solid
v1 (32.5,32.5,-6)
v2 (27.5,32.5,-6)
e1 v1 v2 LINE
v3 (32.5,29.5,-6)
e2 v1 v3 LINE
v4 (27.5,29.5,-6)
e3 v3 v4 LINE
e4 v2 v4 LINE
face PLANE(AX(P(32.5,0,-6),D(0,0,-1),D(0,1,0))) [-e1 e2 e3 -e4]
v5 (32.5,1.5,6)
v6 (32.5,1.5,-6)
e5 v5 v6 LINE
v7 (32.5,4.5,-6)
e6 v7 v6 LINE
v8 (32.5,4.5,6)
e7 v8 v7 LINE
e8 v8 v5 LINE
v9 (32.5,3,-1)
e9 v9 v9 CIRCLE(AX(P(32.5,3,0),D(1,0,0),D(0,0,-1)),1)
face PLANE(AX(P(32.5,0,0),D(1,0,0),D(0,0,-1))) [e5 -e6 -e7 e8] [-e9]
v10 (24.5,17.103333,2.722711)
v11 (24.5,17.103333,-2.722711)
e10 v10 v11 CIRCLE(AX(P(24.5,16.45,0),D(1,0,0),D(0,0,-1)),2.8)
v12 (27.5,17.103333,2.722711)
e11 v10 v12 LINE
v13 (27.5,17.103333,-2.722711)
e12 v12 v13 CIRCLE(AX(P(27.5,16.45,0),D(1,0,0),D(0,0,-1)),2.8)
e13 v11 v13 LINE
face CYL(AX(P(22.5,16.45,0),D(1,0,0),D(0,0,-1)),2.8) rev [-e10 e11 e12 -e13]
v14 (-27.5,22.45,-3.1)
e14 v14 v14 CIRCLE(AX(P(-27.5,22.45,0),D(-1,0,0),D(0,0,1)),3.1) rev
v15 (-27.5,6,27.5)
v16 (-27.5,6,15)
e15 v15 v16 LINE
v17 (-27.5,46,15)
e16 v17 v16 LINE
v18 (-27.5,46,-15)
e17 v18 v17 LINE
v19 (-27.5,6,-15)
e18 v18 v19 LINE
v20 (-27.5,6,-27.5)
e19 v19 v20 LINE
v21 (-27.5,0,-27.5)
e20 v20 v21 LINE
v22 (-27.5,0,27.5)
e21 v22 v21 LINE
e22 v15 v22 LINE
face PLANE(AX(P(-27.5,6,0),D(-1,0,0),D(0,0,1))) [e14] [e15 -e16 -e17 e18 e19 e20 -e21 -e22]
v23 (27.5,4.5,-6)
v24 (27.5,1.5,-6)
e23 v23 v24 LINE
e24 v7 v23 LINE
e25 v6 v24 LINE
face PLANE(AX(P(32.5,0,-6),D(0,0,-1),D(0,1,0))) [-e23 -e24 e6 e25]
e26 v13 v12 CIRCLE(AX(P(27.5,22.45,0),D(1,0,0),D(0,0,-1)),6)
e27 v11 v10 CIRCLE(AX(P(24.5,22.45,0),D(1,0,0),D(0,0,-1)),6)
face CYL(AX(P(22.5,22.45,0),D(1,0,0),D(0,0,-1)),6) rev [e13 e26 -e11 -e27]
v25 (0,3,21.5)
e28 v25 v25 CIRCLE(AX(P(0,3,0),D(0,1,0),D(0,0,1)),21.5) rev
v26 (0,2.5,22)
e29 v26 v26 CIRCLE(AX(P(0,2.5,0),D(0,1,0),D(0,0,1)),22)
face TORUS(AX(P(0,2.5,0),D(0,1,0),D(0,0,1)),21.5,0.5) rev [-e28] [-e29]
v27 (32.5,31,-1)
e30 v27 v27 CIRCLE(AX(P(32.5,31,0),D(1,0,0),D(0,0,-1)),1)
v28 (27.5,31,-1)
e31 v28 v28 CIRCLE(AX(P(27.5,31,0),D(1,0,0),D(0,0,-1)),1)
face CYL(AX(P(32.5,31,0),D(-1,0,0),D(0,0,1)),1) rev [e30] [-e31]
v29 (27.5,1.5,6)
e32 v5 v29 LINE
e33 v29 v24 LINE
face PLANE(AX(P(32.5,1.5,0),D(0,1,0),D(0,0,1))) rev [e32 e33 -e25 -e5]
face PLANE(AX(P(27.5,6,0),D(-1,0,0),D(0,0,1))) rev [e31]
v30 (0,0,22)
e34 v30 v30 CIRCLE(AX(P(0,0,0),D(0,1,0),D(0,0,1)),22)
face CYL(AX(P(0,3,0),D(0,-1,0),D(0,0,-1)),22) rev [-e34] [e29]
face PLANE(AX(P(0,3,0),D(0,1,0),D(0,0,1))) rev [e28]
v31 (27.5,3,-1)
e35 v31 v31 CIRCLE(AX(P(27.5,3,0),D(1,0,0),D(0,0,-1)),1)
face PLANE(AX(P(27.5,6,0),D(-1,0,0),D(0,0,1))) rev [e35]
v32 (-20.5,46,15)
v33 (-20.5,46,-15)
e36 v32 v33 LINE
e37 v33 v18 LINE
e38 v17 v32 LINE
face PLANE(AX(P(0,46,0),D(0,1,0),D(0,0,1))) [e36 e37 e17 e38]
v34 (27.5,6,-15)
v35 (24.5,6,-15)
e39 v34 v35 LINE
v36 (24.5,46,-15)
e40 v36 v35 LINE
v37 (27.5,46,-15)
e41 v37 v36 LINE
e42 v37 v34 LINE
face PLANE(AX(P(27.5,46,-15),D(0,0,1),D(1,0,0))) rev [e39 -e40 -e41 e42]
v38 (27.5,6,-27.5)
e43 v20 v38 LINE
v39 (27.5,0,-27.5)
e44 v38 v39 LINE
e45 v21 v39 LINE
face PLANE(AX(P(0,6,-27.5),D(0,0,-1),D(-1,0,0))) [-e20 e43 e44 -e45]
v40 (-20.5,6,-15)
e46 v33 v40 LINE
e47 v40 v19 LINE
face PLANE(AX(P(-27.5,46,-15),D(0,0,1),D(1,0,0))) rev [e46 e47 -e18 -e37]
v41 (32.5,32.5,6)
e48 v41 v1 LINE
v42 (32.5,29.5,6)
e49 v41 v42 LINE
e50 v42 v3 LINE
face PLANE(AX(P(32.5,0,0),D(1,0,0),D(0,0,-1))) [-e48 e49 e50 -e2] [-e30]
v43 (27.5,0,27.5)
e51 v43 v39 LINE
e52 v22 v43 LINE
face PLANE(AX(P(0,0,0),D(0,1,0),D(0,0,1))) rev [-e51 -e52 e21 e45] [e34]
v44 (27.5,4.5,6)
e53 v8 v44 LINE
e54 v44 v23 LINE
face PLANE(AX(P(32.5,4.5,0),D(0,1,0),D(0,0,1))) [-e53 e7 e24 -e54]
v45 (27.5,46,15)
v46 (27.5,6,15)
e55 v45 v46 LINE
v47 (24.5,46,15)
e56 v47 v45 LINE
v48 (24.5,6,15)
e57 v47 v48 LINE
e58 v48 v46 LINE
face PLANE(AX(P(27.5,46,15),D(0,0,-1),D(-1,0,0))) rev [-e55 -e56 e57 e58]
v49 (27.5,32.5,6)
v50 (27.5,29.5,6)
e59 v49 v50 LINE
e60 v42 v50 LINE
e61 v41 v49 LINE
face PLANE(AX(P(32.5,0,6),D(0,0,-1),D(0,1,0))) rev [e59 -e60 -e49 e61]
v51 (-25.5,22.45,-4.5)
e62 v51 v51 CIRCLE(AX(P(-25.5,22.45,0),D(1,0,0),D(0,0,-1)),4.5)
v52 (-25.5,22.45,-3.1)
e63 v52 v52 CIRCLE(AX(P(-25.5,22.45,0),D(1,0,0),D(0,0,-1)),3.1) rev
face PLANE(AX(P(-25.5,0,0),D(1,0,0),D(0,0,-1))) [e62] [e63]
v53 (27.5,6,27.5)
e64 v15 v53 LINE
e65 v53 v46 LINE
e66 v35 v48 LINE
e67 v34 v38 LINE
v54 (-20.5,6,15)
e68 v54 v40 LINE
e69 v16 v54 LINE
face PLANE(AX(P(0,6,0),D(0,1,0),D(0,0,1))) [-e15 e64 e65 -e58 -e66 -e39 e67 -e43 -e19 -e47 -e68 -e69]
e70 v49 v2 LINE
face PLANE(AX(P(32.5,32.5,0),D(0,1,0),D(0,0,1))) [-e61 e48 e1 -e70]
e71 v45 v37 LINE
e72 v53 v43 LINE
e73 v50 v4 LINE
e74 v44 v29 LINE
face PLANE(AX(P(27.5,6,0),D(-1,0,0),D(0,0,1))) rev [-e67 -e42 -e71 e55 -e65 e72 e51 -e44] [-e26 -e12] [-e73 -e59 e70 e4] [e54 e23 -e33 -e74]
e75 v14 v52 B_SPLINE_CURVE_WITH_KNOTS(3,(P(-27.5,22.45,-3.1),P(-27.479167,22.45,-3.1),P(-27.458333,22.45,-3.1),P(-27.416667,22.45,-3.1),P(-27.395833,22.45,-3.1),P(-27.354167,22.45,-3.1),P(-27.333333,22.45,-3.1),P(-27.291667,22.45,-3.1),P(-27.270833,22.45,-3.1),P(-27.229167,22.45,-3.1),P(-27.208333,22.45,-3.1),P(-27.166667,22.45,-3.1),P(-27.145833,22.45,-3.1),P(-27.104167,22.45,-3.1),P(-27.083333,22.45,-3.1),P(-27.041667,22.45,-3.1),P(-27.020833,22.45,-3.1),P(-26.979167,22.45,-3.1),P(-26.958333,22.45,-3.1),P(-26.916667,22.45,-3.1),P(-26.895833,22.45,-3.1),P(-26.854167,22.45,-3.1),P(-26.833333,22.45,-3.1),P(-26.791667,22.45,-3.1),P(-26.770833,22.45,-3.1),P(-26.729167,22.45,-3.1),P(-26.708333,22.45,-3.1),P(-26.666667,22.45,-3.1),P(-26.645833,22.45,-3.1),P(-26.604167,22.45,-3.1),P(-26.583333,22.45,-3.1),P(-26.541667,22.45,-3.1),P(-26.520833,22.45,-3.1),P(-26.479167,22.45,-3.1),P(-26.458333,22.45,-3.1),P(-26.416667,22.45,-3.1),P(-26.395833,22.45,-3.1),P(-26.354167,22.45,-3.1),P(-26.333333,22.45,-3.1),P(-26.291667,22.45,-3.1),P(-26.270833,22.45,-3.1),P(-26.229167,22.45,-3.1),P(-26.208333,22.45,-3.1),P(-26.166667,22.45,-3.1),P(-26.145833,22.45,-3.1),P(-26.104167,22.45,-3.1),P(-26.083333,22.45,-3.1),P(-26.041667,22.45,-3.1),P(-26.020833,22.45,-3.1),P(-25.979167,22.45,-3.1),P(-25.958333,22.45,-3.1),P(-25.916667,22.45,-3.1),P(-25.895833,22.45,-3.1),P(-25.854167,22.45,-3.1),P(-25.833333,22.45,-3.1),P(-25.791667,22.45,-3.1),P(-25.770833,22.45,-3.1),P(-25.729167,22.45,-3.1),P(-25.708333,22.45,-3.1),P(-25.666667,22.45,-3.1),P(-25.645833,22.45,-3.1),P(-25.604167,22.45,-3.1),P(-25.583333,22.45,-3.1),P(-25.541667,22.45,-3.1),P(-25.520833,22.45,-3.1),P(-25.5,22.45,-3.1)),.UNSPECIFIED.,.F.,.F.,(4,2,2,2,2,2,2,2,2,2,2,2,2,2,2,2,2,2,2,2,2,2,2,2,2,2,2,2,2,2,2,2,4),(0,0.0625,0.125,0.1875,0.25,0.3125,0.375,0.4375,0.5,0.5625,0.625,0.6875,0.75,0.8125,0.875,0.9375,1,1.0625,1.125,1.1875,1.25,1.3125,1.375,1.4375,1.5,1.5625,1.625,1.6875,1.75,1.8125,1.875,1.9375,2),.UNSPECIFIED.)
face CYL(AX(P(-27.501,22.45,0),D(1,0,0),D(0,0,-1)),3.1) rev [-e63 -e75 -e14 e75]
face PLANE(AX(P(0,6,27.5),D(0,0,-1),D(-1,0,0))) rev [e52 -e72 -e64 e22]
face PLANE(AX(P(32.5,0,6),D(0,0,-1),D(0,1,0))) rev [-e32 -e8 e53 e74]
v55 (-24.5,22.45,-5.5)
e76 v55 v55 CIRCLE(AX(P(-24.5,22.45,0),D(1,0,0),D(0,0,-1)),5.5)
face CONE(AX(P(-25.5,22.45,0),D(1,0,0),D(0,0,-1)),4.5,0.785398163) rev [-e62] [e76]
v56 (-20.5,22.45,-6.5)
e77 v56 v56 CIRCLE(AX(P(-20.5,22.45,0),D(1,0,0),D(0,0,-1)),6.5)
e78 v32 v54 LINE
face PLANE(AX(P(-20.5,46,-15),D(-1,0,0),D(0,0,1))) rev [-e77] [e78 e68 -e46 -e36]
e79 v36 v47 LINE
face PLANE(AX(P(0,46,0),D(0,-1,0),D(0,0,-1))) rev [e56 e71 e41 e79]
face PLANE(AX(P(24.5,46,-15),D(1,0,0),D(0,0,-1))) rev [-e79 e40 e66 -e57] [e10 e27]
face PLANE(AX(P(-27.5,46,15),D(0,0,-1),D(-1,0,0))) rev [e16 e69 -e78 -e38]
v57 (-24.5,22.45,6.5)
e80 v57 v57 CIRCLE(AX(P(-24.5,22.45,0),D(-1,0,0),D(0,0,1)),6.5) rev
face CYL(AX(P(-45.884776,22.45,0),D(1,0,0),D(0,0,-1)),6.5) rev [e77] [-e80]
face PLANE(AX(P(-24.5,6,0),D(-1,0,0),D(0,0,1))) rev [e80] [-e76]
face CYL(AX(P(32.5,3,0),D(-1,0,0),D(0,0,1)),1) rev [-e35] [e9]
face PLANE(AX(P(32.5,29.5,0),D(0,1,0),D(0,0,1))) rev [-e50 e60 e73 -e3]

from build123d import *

# Parameters (mm, degrees)
CROQUIS8_W              = 55
CROQUIS8_H              = 55
CROQUIS8_R              = 22
SALIENTE_EXTRUIR4_DEPTH = 6
CROQUIS8_3_R            = 22
CORTAR_EXTRUIR6_DEPTH   = 3
REDONDEO1_R             = 0.5
CROQUIS9_W              = 7
CROQUIS9_H              = 30
CROQUIS9_W_2            = 3
SALIENTE_EXTRUIR5_DEPTH = 40
SALIENTE_EXTRUIR6_DEPTH = 5
CORTAR_EXTRUIR7_DEPTH   = 5
CORTAR_EXTRUIR8_REACH   = 77.374
CROQUIS11_R             = 3.1
CROQUIS11_3_R           = 6.5
CORTAR_EXTRUIR9_DEPTH   = 4
CROQUIS12_R             = 5.5
CROQUIS12_R_2           = 3.1
CORTAR_EXTRUIR10_DEPTH  = 1
CHAFL_N1_SIZE           = 1


with BuildPart() as part:
    # Croquis8 → Saliente-Extruir4 (new body)
    # profile 1 of 2: a face of its own
    with BuildSketch(Plane(origin=(0, 0, 0), x_dir=(1, 0, 0), z_dir=(0, 1, 0))):
        Rectangle(CROQUIS8_W, CROQUIS8_H)
        Circle(CROQUIS8_R, mode=Mode.SUBTRACT)
    # profile 2 of 2: a face of its own
    with BuildSketch(Plane(origin=(0, 0, 0), x_dir=(1, 0, 0), z_dir=(0, 1, 0))):
        Circle(CROQUIS8_R)
    extrude(amount=SALIENTE_EXTRUIR4_DEPTH)

    # Croquis8<3> → Cortar-Extruir6 (cut)
    with BuildSketch(Plane(origin=(0, 0, 0), x_dir=(1, 0, 0), z_dir=(0, 1, 0))):
        with Locations(Location((0, 0, 0), (0, 0, 270))):
            Circle(CROQUIS8_3_R)
    extrude(amount=CORTAR_EXTRUIR6_DEPTH, mode=Mode.SUBTRACT)

    # Redondeo1
    redondeo1_edges = [part.edges().sort_by_distance(p)[0] for p in [
        (0, 3, -22),
    ]]
    fillet(redondeo1_edges, radius=REDONDEO1_R)

    # Croquis9 → Saliente-Extruir5 (add)
    with BuildSketch(Plane(origin=(0, 6, 0), x_dir=(1, 0, 0), z_dir=(0, 1, 0))):
        with Locations((-24, 0)):
            Rectangle(CROQUIS9_W, CROQUIS9_H)
        with Locations((26, 0)):
            Rectangle(CROQUIS9_W_2, CROQUIS9_H)
    extrude(amount=SALIENTE_EXTRUIR5_DEPTH)

    # Croquis10 → Saliente-Extruir6 (add)
    with BuildSketch(Plane(origin=(27.5, 0, 0), x_dir=(0, 0, -1), z_dir=(1, 0, 0))):
        with BuildLine():
            Line((0, 2), (0, 1.5))
            Line((0, 1.5), (6, 1.5))
            Line((6, 1.5), (6, 4.5))
            Line((6, 4.5), (0, 4.5))
            Line((0, 4.5), (0, 4))
            ThreePointArc((0, 4), (0.707106781, 3.707106781), (1, 3))
            ThreePointArc((1, 3), (0.707106781, 2.292893219), (0, 2))
        make_face()
        with BuildLine():
            Line((-6, 1.5), (0, 1.5))
            Line((0, 1.5), (0, 2))
            ThreePointArc((0, 2), (-1, 3), (0, 4))
            Line((0, 4), (0, 4.5))
            Line((0, 4.5), (-6, 4.5))
            Line((-6, 4.5), (-6, 1.5))
        make_face()
        with BuildLine():
            Line((-6, 29.5), (0, 29.5))
            Line((0, 29.5), (0, 30))
            ThreePointArc((0, 30), (-1, 31), (0, 32))
            Line((0, 32), (0, 32.5))
            Line((0, 32.5), (-6, 32.5))
            Line((-6, 32.5), (-6, 29.5))
        make_face()
        with BuildLine():
            Line((0, 30), (0, 29.5))
            Line((0, 29.5), (6, 29.5))
            Line((6, 29.5), (6, 32.5))
            Line((6, 32.5), (0, 32.5))
            Line((0, 32.5), (0, 32))
            ThreePointArc((0, 32), (0.707106781, 31.707106781), (1, 31))
            ThreePointArc((1, 31), (0.707106781, 30.292893219), (0, 30))
        make_face()
    extrude(amount=SALIENTE_EXTRUIR6_DEPTH)

    # Croquis10<3> → Cortar-Extruir7 (cut)
    with BuildSketch(Plane(origin=(27.5, 0, 0), x_dir=(0, 0, -1), z_dir=(1, 0, 0))):
        with BuildLine():
            ThreePointArc((-2.722711067, 17.103333333), (-2.198787545, 14.716410275), (0, 13.65))
            Line((0, 13.65), (0, 16.45))
            ThreePointArc((0, 16.45), (-1.4, 16.615619142), (-2.722711067, 17.103333333))
        make_face()
        with BuildLine():
            Line((0, 16.45), (0, 13.65))
            ThreePointArc((0, 13.65), (1.979898987, 14.470101013), (2.8, 16.45))
            ThreePointArc((2.8, 16.45), (2.780610633, 16.778944533), (2.722711067, 17.103333333))
            ThreePointArc((2.722711067, 17.103333333), (1.4, 16.615619142), (0, 16.45))
        make_face()
        with BuildLine():
            ThreePointArc((-2.722711067, 17.103333333), (-1.4, 16.615619142), (0, 16.45))
            Line((0, 16.45), (0, 19.25))
            ThreePointArc((0, 19.25), (-1.733589725, 18.648787545), (-2.722711067, 17.103333333))
        make_face()
        with BuildLine():
            Line((0, 19.25), (0, 16.45))
            ThreePointArc((0, 16.45), (1.4, 16.615619142), (2.722711067, 17.103333333))
            ThreePointArc((2.722711067, 17.103333333), (1.733589725, 18.648787545), (0, 19.25))
        make_face()
        with BuildLine():
            ThreePointArc((0, 28.45), (-5.834380858, 23.85), (-2.722711067, 17.103333333))
            ThreePointArc((-2.722711067, 17.103333333), (-1.733589725, 18.648787545), (0, 19.25))
            Line((0, 19.25), (0, 28.45))
        make_face()
        with BuildLine():
            Line((0, 28.45), (0, 19.25))
            ThreePointArc((0, 19.25), (1.733589725, 18.648787545), (2.722711067, 17.103333333))
            ThreePointArc((2.722711067, 17.103333333), (5.115479763, 19.314419225), (6, 22.45))
            ThreePointArc((6, 22.45), (4.242640687, 26.692640687), (0, 28.45))
        make_face()
    extrude(amount=-CORTAR_EXTRUIR7_DEPTH, mode=Mode.SUBTRACT)

    # Croquis11 → Cortar-Extruir8 (cut, up to next)
    with BuildSketch(Plane(origin=(-20.5, 0, 0), x_dir=(0, 0, -1), z_dir=(1, 0, 0)), mode=Mode.PRIVATE) as cortar_extruir8_sk1:
        with Locations((0, 22.45)):
            Circle(CROQUIS11_R)
    cortar_extruir8_tool1 = extrude(cortar_extruir8_sk1.sketch, amount=-CORTAR_EXTRUIR8_REACH, mode=Mode.PRIVATE) & part.part
    add(cortar_extruir8_tool1.solids().sort_by_distance((-20.5, 22.45, 0))[0], mode=Mode.SUBTRACT)

    # Croquis11<3> → Cortar-Extruir9 (cut)
    with BuildSketch(Plane(origin=(-20.5, 0, 0), x_dir=(0, 0, -1), z_dir=(1, 0, 0))):
        with Locations((0, 22.45)):
            Circle(CROQUIS11_3_R)
    extrude(amount=-CORTAR_EXTRUIR9_DEPTH, mode=Mode.SUBTRACT)

    # Croquis12 → Cortar-Extruir10 (cut)
    with BuildSketch(Plane(origin=(-24.5, 0, 0), x_dir=(0, 0, -1), z_dir=(1, 0, 0))):
        with Locations((0, 22.45)):
            Circle(CROQUIS12_R)
        with Locations((0, 22.45)):
            Circle(CROQUIS12_R_2, mode=Mode.SUBTRACT)
    extrude(amount=-CORTAR_EXTRUIR10_DEPTH, mode=Mode.SUBTRACT)

    # Chaflán1
    chafl_n1_edges = [part.edges().sort_by_distance(p)[0] for p in [
        (-25.5, 22.45, 5.5),
    ]]
    chamfer(chafl_n1_edges, length=CHAFL_N1_SIZE - 0.0001)  # a hair under: the kernel refuses the full size


solid = part.part
